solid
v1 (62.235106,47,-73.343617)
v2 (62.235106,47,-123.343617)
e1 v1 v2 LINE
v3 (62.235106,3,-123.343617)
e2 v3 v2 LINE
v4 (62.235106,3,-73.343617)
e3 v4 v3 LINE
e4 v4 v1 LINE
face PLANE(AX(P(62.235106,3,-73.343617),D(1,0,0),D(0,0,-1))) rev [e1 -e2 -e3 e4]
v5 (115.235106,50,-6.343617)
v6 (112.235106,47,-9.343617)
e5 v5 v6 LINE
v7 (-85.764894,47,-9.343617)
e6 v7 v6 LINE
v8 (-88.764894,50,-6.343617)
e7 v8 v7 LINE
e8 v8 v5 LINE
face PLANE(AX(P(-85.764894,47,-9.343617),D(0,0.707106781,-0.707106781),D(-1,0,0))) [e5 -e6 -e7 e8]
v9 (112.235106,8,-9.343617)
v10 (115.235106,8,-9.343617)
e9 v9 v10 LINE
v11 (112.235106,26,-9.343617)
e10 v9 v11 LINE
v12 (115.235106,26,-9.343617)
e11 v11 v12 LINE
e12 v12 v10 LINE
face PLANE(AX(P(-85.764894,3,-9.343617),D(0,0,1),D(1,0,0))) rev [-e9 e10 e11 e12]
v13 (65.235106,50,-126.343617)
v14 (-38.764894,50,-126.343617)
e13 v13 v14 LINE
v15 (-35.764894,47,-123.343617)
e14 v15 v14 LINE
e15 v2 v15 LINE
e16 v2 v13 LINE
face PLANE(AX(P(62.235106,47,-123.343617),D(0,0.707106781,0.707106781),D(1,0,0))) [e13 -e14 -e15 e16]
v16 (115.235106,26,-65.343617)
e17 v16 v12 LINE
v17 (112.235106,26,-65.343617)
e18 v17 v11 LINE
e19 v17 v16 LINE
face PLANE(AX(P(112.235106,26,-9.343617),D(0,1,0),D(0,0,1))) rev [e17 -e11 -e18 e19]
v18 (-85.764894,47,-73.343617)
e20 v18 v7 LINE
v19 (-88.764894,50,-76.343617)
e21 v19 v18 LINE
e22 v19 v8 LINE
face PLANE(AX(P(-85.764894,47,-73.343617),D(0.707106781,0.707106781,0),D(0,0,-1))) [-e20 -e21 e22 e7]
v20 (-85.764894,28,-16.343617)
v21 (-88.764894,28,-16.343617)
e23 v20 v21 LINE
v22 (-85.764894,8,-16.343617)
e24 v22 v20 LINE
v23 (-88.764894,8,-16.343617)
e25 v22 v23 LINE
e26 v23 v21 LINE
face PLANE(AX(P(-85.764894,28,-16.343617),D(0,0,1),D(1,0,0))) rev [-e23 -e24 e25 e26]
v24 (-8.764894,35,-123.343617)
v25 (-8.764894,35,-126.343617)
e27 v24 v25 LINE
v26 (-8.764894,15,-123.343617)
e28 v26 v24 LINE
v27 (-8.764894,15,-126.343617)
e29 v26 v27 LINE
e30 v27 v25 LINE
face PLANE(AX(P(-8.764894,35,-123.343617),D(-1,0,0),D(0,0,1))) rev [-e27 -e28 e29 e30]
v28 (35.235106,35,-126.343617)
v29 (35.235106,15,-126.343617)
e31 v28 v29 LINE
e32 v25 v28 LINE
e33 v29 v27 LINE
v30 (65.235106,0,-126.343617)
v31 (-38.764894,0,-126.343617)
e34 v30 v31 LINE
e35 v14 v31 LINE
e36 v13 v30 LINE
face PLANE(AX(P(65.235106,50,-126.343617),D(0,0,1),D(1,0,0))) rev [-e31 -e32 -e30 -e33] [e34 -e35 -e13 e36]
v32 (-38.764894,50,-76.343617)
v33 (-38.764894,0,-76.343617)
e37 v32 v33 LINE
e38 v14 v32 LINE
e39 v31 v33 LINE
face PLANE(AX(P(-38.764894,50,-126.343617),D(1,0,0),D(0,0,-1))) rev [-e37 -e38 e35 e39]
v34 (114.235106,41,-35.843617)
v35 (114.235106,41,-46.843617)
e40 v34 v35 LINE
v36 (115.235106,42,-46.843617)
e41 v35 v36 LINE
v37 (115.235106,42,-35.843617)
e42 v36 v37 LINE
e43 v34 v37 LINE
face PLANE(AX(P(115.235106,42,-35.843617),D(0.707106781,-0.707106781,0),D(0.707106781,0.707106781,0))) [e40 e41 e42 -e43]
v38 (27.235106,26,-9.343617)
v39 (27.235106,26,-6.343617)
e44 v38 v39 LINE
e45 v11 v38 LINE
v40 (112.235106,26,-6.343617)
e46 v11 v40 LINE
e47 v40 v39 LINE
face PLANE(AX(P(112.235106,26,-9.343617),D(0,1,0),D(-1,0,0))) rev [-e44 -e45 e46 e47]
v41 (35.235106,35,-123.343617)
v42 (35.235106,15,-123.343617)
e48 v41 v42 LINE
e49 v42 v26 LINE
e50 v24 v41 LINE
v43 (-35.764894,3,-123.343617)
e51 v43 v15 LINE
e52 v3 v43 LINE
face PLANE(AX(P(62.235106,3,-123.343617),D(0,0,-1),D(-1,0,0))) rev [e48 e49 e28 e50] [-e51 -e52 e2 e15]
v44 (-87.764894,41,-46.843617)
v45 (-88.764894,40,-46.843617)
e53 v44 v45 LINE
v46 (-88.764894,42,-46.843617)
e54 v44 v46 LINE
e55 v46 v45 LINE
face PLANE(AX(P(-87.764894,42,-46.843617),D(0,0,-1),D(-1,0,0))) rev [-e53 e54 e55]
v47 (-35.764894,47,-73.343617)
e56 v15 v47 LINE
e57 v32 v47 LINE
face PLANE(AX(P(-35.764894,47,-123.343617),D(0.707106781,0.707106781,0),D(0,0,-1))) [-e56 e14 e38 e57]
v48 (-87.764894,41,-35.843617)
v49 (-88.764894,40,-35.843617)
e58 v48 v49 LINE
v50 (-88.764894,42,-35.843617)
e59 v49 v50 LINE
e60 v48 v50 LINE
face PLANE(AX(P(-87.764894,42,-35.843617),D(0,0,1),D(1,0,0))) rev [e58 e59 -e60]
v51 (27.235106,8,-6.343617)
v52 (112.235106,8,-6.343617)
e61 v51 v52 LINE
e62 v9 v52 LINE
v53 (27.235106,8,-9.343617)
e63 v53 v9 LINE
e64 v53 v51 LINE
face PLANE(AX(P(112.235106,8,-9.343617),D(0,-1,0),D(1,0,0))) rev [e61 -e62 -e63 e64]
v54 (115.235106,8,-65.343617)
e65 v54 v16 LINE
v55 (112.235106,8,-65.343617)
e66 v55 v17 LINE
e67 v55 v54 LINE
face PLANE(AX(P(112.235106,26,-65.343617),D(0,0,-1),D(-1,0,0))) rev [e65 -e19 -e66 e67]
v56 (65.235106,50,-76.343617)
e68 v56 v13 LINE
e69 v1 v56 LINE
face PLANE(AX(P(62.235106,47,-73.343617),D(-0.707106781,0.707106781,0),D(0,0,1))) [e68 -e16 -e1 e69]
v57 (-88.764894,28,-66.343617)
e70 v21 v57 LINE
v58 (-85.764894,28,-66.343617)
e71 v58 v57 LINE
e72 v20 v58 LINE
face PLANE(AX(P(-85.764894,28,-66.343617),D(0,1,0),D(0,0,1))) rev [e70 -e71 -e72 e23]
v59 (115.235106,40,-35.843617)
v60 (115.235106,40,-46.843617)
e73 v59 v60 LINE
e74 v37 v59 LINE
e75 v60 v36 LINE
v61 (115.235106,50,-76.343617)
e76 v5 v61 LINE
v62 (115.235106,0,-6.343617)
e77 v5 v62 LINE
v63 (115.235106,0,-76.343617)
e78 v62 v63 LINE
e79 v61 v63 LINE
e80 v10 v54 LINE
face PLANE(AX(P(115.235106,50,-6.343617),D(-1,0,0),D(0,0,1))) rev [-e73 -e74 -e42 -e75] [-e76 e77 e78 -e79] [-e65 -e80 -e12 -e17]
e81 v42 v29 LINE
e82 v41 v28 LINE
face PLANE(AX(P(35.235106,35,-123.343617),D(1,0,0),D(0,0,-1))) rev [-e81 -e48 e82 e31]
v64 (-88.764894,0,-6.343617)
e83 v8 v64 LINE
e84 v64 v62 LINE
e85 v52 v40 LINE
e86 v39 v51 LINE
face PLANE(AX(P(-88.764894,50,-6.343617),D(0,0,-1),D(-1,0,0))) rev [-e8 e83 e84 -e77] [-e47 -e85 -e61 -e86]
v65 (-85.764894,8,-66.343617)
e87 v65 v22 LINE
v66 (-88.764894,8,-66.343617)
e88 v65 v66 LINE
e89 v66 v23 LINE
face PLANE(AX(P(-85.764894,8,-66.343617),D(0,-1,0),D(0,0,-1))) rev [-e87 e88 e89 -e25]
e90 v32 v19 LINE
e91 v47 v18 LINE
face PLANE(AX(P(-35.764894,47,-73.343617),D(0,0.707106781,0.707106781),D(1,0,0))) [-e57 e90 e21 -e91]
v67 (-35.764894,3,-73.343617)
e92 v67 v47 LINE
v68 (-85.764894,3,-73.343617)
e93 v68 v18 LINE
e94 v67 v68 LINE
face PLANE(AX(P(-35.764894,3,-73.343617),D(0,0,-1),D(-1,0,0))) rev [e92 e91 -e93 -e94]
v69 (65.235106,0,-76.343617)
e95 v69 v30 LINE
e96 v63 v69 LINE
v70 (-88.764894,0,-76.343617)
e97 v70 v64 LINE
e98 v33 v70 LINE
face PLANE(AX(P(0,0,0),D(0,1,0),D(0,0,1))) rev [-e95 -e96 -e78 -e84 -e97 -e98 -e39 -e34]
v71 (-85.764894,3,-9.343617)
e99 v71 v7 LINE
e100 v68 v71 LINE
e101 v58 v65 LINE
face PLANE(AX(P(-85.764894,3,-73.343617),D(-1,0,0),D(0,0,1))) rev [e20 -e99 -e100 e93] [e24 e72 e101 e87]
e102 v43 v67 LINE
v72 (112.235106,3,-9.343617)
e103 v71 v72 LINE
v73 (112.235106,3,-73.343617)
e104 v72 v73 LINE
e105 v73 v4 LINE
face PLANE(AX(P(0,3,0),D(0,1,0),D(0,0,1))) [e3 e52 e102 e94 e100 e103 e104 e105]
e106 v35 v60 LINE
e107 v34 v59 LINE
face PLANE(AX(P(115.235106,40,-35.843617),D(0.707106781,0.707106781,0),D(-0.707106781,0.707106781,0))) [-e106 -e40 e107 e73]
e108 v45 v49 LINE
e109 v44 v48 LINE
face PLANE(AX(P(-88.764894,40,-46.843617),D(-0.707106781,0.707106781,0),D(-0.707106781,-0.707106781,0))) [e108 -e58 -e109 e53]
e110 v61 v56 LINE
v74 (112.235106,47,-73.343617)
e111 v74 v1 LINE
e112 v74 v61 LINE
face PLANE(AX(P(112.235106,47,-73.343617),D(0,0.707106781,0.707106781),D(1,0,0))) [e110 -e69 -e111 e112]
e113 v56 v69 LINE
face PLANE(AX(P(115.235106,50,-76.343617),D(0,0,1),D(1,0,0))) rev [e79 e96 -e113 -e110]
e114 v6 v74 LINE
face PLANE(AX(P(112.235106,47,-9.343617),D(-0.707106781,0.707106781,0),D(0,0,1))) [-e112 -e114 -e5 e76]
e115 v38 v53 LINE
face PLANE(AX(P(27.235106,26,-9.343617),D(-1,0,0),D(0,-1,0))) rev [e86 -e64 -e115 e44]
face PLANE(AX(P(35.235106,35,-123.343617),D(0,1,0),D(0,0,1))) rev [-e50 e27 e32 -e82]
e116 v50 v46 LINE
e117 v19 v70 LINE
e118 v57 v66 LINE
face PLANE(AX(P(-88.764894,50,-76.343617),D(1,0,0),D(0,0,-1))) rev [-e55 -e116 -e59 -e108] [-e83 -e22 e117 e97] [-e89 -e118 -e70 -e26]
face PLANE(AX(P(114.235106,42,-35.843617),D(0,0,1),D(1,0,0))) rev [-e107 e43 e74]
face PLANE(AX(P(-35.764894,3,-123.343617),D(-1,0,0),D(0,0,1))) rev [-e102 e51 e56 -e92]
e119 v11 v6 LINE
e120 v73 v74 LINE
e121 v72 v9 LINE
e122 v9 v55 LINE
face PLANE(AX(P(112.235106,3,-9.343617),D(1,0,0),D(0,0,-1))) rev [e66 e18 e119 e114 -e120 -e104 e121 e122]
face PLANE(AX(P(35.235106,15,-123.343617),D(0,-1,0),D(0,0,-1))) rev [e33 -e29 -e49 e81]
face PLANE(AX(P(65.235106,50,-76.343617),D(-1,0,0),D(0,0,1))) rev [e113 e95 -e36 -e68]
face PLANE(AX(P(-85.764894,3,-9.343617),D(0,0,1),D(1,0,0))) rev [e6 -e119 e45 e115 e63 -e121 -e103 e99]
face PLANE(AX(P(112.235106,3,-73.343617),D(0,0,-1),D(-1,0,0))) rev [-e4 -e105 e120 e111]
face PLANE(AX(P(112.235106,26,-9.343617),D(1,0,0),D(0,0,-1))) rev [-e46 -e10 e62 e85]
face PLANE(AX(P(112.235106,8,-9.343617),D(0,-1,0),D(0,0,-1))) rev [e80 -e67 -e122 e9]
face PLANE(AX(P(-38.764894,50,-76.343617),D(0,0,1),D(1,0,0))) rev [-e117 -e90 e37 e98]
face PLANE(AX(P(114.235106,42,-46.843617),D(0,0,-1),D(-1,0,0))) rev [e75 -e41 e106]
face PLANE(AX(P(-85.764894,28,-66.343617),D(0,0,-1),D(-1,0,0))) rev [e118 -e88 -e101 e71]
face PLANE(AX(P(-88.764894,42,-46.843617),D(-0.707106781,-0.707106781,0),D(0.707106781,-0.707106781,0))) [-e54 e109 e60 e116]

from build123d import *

# Parameters (mm, degrees)
BOSS_EXTRUDE1_DEPTH = 50
CUT_EXTRUDE1_DEPTH  = 47
CHAMFER3_SIZE       = 3
SKETCH5_W           = 56
SKETCH5_H           = 18
CUT_EXTRUDE2_DEPTH  = 3
SKETCH6_W           = 85
SKETCH6_H           = 18
CUT_EXTRUDE3_DEPTH  = 3
SKETCH7_W           = 50
SKETCH7_H           = 20
CUT_EXTRUDE4_DEPTH  = 3
SKETCH8_W           = 44
SKETCH8_H           = 20
CUT_EXTRUDE5_DEPTH  = 3
SKETCH9_W           = 11
SKETCH9_H           = 2
CUT_EXTRUDE6_DEPTH  = 1
DRAFT3_START        = -46.843617021
DRAFT3_DEPTH        = 11
SKETCH12_W          = 11
SKETCH12_H          = 2
CUT_EXTRUDE7_DEPTH  = 1
DRAFT4_START        = -46.843617021
DRAFT4_DEPTH        = 11


# Read off the part's stored shape, not the designer's step: Draft3, Draft4
with BuildPart() as part:
    # Sketch1 → Boss-Extrude1 (new body)
    with BuildSketch(Plane(origin=(0, 0, 0), x_dir=(1, 0, 0), z_dir=(0, 1, 0))):
        Polygon((-88.764893617, 6.343617021), (115.235106383, 6.343617021), (115.235106383, 76.343617021), (65.235106383, 76.343617021), (65.235106383, 126.343617021), (-38.764893617, 126.343617021), (-38.764893617, 76.343617021), (-88.764893617, 76.343617021), align=None)
    extrude(amount=BOSS_EXTRUDE1_DEPTH)

    # Sketch4 → Cut-Extrude1 (cut)
    with BuildSketch(Plane(origin=(0, 50, 0), x_dir=(1, 0, 0), z_dir=(0, 1, 0))):
        Polygon((-35.764893617, 123.343617021), (-35.764893617, 73.343617021), (-85.764893617, 73.343617021), (-85.764893617, 9.343617021), (112.235106383, 9.343617021), (112.235106383, 73.343617021), (62.235106383, 73.343617021), (62.235106383, 123.343617021), align=None)
    extrude(amount=-CUT_EXTRUDE1_DEPTH, mode=Mode.SUBTRACT)

    # Chamfer3
    chamfer3_edges = [part.edges().sort_by_distance(p)[0] for p in [
        (13.235106383, 50, -123.343617021),
        (-35.764893617, 50, -98.343617021),
        (-60.764893617, 50, -73.343617021),
        (-85.764893617, 50, -41.343617021),
        (13.235106383, 50, -9.343617021),
        (112.235106383, 50, -41.343617021),
        (87.235106383, 50, -73.343617021),
        (62.235106383, 50, -98.343617021),
    ]]
    chamfer(chamfer3_edges, length=CHAMFER3_SIZE - 0.0001)  # a hair under: the kernel refuses the full size

    # Sketch5 → Cut-Extrude2 (cut)
    with BuildSketch(Plane(origin=(115.235106383, 0, 0), x_dir=(0, 0, -1), z_dir=(1, 0, 0))):
        with Locations((37.343617021, 17)):
            Rectangle(SKETCH5_W, SKETCH5_H)
    extrude(amount=-CUT_EXTRUDE2_DEPTH, mode=Mode.SUBTRACT)

    # Sketch6 → Cut-Extrude3 (cut)
    with BuildSketch(Plane.XY.offset(-6.343617021)):
        with Locations((69.735106383, 17)):
            Rectangle(SKETCH6_W, SKETCH6_H)
    extrude(amount=-CUT_EXTRUDE3_DEPTH, mode=Mode.SUBTRACT)

    # Sketch7 → Cut-Extrude4 (cut)
    with BuildSketch(Plane.ZY.offset(88.764893617)):
        with Locations((-41.343617021, 18)):
            Rectangle(SKETCH7_W, SKETCH7_H)
    extrude(amount=-CUT_EXTRUDE4_DEPTH, mode=Mode.SUBTRACT)

    # Sketch8 → Cut-Extrude5 (cut)
    with BuildSketch(Plane(origin=(0, 0, -126.343617021), x_dir=(-1, 0, 0), z_dir=(0, 0, -1))):
        with Locations((-13.235106383, 25)):
            Rectangle(SKETCH8_W, SKETCH8_H)
    extrude(amount=-CUT_EXTRUDE5_DEPTH, mode=Mode.SUBTRACT)

    # Sketch9 → Cut-Extrude6 (cut)
    with BuildSketch(Plane(origin=(115.235106383, 0, 0), x_dir=(0, 0, -1), z_dir=(1, 0, 0))):
        with Locations((41.343617021, 41)):
            Rectangle(SKETCH9_W, SKETCH9_H)
    extrude(amount=-CUT_EXTRUDE6_DEPTH, mode=Mode.SUBTRACT)

    # Draft3 outline → Draft3 (add)
    with BuildSketch(Plane.XY.offset(DRAFT3_START)):
        Polygon((114.235106383, 42), (114.235106383, 41), (115.235106383, 42), align=None)
        Polygon((115.235106383, 40), (114.235106383, 41), (114.235106383, 40), align=None)
    extrude(amount=DRAFT3_DEPTH)

    # Sketch12 → Cut-Extrude7 (cut)
    with BuildSketch(Plane.ZY.offset(88.764893617)):
        with Locations((-41.343617021, 41)):
            Rectangle(SKETCH12_W, SKETCH12_H)
    extrude(amount=-CUT_EXTRUDE7_DEPTH, mode=Mode.SUBTRACT)

    # Draft4 outline → Draft4 (add)
    with BuildSketch(Plane.XY.offset(DRAFT4_START)):
        Polygon((-87.764893617, 42), (-88.764893617, 42), (-87.764893617, 41), align=None)
        Polygon((-87.764893617, 40), (-87.764893617, 41), (-88.764893617, 40), align=None)
    extrude(amount=DRAFT4_DEPTH)


solid = part.part
